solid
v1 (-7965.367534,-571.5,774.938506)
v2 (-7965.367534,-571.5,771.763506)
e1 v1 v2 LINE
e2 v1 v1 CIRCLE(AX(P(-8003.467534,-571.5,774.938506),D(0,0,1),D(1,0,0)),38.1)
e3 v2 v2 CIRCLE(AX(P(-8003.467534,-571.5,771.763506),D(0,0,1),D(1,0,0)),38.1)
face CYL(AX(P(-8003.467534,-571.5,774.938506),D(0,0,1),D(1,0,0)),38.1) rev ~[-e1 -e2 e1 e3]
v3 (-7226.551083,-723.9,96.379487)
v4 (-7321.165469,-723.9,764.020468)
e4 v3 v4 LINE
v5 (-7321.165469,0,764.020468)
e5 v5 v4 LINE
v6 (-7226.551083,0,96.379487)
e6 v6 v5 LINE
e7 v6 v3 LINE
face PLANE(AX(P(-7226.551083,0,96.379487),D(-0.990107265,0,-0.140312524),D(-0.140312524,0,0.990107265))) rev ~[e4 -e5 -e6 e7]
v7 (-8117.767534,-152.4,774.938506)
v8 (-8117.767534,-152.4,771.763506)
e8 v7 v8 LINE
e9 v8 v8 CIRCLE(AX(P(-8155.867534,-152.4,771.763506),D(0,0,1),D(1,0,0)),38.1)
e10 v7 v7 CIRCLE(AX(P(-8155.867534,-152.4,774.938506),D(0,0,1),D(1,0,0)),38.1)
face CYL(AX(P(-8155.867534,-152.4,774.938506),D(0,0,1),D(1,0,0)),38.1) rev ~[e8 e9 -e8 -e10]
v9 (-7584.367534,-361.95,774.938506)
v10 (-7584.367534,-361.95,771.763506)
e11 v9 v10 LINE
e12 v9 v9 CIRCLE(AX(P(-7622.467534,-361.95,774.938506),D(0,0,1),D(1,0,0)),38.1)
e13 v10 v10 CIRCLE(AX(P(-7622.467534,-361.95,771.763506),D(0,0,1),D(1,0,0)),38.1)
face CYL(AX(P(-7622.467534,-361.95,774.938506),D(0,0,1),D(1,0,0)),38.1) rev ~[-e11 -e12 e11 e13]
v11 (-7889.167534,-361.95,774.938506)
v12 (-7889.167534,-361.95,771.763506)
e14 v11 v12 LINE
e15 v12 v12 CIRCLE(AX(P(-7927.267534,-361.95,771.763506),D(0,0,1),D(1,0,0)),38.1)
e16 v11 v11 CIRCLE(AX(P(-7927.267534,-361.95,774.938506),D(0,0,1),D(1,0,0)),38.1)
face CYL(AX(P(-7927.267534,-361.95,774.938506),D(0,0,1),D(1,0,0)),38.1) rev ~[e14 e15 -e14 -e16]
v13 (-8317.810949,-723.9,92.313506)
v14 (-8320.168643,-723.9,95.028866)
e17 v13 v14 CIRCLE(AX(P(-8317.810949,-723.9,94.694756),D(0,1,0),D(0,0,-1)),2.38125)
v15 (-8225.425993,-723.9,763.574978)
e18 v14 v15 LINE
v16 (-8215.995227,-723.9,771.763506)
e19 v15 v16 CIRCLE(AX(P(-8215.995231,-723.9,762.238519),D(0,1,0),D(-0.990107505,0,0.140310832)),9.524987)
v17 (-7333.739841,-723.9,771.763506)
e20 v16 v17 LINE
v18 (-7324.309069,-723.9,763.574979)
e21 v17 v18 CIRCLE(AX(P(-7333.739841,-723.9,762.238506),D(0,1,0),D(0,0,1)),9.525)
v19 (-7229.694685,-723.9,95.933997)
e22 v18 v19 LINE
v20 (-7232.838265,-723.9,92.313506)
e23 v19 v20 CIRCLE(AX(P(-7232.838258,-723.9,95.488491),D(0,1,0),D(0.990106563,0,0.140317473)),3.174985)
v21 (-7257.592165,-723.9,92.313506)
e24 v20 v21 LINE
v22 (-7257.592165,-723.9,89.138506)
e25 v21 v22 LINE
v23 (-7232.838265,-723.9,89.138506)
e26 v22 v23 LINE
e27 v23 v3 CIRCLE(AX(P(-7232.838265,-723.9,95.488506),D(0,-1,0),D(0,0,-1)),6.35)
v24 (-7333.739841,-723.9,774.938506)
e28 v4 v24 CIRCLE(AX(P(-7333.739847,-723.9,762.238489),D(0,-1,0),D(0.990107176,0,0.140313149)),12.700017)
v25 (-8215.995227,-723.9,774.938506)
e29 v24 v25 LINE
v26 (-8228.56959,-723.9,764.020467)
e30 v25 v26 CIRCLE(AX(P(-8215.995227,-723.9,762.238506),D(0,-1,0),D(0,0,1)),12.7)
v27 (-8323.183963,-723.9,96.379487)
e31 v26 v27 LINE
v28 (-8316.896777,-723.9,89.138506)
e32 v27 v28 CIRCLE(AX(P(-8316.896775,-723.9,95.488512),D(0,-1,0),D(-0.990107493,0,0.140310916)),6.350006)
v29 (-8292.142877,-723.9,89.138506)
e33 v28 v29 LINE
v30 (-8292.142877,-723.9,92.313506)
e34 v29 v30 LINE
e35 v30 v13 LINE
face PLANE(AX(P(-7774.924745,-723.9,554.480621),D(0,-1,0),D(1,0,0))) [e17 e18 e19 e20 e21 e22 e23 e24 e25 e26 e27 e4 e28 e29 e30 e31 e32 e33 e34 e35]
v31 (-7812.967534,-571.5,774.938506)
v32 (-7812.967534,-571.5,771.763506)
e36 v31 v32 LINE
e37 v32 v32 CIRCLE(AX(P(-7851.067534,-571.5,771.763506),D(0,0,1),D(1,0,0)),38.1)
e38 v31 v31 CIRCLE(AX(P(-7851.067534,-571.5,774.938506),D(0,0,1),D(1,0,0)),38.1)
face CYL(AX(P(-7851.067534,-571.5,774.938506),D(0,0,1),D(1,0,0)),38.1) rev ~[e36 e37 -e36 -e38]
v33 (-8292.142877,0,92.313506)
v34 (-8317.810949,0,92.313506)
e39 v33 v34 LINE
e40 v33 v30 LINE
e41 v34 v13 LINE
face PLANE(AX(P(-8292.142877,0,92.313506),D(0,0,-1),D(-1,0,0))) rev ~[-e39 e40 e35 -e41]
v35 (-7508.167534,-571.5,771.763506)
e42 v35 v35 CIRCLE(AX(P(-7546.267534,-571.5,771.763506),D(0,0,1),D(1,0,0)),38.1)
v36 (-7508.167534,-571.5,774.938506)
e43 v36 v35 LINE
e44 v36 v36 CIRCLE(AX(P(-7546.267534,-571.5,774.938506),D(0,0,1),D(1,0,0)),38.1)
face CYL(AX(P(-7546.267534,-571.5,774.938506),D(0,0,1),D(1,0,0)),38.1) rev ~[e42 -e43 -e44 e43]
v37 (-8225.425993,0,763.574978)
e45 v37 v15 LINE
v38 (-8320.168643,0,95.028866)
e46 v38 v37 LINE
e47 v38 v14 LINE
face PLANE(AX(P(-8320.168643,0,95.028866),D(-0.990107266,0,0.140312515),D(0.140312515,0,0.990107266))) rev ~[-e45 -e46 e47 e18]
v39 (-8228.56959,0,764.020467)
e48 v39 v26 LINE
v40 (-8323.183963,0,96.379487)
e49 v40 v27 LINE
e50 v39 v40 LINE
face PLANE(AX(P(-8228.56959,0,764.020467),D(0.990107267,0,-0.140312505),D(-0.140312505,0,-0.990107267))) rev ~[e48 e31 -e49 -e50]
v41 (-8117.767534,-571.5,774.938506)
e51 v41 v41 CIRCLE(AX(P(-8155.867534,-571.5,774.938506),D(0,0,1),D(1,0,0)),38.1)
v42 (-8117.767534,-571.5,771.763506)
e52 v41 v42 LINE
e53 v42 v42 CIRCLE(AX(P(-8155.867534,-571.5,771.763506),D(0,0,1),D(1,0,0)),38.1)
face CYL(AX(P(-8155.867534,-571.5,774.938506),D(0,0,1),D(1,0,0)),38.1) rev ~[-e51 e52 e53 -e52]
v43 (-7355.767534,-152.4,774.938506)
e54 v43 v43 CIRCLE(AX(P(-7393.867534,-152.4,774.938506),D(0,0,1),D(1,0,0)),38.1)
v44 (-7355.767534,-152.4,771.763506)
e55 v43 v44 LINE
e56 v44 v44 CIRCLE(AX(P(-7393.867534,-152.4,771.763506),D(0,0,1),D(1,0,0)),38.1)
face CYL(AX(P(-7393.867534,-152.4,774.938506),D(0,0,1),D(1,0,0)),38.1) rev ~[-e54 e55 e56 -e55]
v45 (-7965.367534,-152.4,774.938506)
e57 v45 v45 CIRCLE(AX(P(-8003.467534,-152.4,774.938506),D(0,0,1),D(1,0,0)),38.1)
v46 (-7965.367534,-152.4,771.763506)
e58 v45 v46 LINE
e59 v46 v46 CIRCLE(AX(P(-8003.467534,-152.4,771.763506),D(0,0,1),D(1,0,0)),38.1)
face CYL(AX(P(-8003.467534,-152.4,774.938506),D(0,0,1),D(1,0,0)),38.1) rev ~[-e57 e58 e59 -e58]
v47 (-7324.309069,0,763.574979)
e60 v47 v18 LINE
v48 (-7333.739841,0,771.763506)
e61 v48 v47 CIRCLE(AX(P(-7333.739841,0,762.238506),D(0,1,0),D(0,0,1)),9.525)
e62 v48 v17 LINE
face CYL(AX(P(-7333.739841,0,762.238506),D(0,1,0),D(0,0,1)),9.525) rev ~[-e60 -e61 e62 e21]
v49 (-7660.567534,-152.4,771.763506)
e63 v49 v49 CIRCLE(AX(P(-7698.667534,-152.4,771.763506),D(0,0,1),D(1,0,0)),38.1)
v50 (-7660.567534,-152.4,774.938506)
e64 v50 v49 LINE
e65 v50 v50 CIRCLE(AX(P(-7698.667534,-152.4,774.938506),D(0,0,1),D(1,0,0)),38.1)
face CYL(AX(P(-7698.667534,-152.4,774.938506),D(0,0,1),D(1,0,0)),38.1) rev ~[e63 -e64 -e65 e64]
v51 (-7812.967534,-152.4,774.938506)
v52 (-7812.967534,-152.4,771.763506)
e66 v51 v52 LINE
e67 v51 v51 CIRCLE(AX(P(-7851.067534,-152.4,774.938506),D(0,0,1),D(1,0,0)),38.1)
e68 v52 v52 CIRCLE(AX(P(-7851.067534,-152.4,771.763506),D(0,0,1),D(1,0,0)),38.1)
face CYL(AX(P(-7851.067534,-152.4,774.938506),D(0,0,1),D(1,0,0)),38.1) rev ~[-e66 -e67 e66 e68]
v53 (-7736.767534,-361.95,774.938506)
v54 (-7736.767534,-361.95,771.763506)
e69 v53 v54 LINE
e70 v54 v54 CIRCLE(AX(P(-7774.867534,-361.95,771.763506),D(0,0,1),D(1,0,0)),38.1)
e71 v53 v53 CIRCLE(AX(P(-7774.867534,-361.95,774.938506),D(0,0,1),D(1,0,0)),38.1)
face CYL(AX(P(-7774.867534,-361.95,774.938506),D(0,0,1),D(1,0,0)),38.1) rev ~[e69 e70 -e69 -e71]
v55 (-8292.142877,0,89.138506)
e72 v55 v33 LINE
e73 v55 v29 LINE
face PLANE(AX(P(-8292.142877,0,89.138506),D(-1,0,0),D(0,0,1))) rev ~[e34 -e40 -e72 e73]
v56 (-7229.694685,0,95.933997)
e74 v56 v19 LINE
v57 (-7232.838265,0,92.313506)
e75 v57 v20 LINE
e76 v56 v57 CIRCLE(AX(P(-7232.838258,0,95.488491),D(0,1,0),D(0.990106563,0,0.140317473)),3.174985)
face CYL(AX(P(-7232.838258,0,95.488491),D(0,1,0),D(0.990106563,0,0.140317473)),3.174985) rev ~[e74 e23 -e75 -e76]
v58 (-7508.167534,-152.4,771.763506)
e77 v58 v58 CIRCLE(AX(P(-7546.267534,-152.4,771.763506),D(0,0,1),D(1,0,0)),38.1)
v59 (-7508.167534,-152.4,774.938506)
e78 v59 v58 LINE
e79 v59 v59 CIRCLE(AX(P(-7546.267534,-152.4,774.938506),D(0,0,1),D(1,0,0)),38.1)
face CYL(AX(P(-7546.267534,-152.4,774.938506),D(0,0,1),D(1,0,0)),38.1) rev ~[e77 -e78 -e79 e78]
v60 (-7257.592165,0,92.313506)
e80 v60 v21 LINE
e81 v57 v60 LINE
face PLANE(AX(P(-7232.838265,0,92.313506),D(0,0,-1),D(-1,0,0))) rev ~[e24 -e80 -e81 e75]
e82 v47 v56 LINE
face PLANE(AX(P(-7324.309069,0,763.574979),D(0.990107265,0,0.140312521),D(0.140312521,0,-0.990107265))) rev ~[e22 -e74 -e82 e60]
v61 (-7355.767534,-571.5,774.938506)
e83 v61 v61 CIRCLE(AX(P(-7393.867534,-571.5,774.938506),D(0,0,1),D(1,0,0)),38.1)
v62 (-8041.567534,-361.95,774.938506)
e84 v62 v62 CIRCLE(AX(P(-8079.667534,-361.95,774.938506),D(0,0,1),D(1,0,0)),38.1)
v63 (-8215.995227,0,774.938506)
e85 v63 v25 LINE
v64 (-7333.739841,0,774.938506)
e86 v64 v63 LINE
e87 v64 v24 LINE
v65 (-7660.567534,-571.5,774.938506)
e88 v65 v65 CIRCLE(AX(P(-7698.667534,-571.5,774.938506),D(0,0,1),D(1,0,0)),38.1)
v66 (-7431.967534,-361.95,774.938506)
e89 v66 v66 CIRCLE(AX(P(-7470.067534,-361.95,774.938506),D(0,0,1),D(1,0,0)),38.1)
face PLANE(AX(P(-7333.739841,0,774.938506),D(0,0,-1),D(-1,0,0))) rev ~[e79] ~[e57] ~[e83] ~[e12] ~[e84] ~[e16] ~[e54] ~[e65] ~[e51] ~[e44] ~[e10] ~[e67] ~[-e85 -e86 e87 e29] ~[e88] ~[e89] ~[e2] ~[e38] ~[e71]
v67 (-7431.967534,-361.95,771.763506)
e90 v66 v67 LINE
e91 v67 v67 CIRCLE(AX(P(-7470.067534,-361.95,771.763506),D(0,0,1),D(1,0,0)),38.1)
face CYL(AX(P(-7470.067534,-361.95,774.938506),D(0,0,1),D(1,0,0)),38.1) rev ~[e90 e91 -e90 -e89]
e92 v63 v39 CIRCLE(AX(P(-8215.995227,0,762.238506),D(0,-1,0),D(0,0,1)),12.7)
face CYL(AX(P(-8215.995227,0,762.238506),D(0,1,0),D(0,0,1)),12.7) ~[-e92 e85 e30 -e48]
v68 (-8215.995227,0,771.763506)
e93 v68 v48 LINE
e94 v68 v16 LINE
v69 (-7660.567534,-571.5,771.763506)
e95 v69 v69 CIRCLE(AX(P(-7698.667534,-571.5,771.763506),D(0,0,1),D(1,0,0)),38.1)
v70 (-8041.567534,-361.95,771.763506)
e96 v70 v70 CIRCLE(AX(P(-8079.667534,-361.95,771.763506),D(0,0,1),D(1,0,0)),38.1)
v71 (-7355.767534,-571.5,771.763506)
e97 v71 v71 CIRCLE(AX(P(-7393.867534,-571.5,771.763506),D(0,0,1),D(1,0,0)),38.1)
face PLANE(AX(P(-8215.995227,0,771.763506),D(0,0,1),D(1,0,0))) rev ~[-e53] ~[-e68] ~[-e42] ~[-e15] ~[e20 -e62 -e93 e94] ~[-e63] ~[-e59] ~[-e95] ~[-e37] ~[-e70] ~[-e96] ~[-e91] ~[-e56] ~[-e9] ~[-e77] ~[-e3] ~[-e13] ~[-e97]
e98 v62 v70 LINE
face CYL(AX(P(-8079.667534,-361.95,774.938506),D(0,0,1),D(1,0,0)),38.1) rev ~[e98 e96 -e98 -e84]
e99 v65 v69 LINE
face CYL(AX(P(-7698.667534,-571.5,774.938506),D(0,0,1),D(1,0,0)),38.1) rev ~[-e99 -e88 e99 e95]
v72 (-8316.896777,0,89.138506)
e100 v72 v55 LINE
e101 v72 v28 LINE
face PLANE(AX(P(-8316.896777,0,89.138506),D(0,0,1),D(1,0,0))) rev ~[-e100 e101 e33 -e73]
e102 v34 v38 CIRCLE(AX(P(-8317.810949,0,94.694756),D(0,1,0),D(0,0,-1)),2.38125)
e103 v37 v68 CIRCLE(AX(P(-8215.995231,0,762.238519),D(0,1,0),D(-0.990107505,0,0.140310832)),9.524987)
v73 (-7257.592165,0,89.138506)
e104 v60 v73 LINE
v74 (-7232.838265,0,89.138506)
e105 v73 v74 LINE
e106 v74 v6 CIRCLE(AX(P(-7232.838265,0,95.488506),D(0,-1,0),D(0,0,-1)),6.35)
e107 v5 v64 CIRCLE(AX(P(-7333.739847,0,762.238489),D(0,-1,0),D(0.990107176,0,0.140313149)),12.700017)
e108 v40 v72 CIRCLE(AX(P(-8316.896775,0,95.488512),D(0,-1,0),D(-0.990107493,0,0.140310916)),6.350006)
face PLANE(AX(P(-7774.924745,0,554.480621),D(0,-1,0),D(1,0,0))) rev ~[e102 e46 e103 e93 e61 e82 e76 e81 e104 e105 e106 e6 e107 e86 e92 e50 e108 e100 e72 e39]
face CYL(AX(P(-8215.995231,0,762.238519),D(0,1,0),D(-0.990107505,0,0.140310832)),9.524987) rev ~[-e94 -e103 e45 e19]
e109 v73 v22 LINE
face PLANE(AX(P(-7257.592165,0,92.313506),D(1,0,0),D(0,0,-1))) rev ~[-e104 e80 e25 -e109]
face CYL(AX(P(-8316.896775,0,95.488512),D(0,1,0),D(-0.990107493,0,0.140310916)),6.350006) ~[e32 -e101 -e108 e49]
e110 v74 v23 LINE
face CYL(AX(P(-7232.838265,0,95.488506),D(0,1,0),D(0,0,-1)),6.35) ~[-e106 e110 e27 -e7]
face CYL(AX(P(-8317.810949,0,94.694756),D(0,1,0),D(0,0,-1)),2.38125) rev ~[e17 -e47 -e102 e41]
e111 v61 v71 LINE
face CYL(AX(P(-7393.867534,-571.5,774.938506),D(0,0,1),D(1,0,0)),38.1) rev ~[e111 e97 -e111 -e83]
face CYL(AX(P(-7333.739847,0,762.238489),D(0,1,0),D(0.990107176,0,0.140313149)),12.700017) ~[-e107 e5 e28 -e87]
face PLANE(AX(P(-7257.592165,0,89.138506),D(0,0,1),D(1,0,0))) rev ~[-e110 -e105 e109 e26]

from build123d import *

# Parameters (mm, degrees)
F1_DEPTH = 723.9
F2_R     = 38.1
F3_DEPTH = 25.4


# Not quite as in the source:
# - ends of sketch curves that miss each other by under 0.0002 mm in the source are joined


with BuildPart() as f1:
    # F0 (on Front) → F1 (new body)
    with BuildSketch(Plane.XZ):
        with BuildLine():
            ThreePointArc((-8215.9952266, 774.938506), (-8224.3216631827, 771.8281073386), (-8228.56958997, 764.0204672337))
            Line((-8228.56958997, 764.0204672337), (-8323.1839632, 96.3794872))
            ThreePointArc((-8323.1839632, 96.3794872), (-8321.6915780693, 91.3252877086), (-8316.8967774, 89.138506))
            Line((-8316.8967774, 89.138506), (-8292.1428772, 89.138506))
            Line((-8292.1428772, 89.138506), (-8292.1428772, 92.313506))
            Line((-8292.1428772, 92.313506), (-8317.8109488, 92.313506))
            ThreePointArc((-8317.8109488, 92.313506), (-8319.6089965519, 93.1335462625), (-8320.1686430016, 95.0288661831))
            Line((-8320.1686430016, 95.0288661831), (-8225.4259926, 763.5749778))
            ThreePointArc((-8225.4259926, 763.5749778), (-8222.2400533643, 769.4307075881), (-8215.9952266, 771.763506))
            Line((-8215.9952266, 771.763506), (-7333.739841, 771.763506))
            ThreePointArc((-7333.739841, 771.763506), (-7327.4950142357, 769.4307075881), (-7324.3090687225, 763.5749786896))
            Line((-7324.3090687225, 763.5749786896), (-7229.6946846, 95.9339966))
            ThreePointArc((-7229.6946846, 95.9339966), (-7230.4408638812, 93.4068975271), (-7232.8382648, 92.313506))
            Line((-7232.8382648, 92.313506), (-7257.592165, 92.313506))
            Line((-7257.592165, 92.313506), (-7257.592165, 89.138506))
            Line((-7257.592165, 89.138506), (-7232.8382648, 89.138506))
            ThreePointArc((-7232.8382648, 89.138506), (-7228.0434641307, 91.3252877086), (-7226.551083115, 96.3794866168))
            Line((-7226.551083115, 96.3794866168), (-7321.1654694, 764.0204684))
            ThreePointArc((-7321.1654694, 764.0204684), (-7325.4134044173, 771.8281073386), (-7333.739841, 774.938506))
            Line((-7333.739841, 774.938506), (-8215.9952266, 774.938506))
        make_face()
    extrude(amount=F1_DEPTH)

    # F2 (on face) → F3 (cut)
    with BuildSketch(Plane.XY.offset(774.938506)):
        with Locations((-8155.8675338, -152.4)):
            Circle(F2_R)
        with Locations((-8003.4675338, -152.4)):
            Circle(F2_R)
        with Locations((-7851.0675338, -152.4)):
            Circle(F2_R)
        with Locations((-7698.6675338, -152.4)):
            Circle(F2_R)
        with Locations((-7546.2675338, -152.4)):
            Circle(F2_R)
        with Locations((-7393.8675338, -152.4)):
            Circle(F2_R)
        with Locations((-8079.6675338, -361.95)):
            Circle(F2_R)
        with Locations((-7927.2675338, -361.95)):
            Circle(F2_R)
        with Locations((-7774.8675338, -361.95)):
            Circle(F2_R)
        with Locations((-7622.4675338, -361.95)):
            Circle(F2_R)
        with Locations((-7470.0675338, -361.95)):
            Circle(F2_R)
        with Locations((-8155.8675338, -571.5)):
            Circle(F2_R)
        with Locations((-8003.4675338, -571.5)):
            Circle(F2_R)
        with Locations((-7851.0675338, -571.5)):
            Circle(F2_R)
        with Locations((-7698.6675338, -571.5)):
            Circle(F2_R)
        with Locations((-7546.2675338, -571.5)):
            Circle(F2_R)
        with Locations((-7393.8675338, -571.5)):
            Circle(F2_R)
    extrude(amount=-F3_DEPTH, mode=Mode.SUBTRACT)


solid = f1.part
